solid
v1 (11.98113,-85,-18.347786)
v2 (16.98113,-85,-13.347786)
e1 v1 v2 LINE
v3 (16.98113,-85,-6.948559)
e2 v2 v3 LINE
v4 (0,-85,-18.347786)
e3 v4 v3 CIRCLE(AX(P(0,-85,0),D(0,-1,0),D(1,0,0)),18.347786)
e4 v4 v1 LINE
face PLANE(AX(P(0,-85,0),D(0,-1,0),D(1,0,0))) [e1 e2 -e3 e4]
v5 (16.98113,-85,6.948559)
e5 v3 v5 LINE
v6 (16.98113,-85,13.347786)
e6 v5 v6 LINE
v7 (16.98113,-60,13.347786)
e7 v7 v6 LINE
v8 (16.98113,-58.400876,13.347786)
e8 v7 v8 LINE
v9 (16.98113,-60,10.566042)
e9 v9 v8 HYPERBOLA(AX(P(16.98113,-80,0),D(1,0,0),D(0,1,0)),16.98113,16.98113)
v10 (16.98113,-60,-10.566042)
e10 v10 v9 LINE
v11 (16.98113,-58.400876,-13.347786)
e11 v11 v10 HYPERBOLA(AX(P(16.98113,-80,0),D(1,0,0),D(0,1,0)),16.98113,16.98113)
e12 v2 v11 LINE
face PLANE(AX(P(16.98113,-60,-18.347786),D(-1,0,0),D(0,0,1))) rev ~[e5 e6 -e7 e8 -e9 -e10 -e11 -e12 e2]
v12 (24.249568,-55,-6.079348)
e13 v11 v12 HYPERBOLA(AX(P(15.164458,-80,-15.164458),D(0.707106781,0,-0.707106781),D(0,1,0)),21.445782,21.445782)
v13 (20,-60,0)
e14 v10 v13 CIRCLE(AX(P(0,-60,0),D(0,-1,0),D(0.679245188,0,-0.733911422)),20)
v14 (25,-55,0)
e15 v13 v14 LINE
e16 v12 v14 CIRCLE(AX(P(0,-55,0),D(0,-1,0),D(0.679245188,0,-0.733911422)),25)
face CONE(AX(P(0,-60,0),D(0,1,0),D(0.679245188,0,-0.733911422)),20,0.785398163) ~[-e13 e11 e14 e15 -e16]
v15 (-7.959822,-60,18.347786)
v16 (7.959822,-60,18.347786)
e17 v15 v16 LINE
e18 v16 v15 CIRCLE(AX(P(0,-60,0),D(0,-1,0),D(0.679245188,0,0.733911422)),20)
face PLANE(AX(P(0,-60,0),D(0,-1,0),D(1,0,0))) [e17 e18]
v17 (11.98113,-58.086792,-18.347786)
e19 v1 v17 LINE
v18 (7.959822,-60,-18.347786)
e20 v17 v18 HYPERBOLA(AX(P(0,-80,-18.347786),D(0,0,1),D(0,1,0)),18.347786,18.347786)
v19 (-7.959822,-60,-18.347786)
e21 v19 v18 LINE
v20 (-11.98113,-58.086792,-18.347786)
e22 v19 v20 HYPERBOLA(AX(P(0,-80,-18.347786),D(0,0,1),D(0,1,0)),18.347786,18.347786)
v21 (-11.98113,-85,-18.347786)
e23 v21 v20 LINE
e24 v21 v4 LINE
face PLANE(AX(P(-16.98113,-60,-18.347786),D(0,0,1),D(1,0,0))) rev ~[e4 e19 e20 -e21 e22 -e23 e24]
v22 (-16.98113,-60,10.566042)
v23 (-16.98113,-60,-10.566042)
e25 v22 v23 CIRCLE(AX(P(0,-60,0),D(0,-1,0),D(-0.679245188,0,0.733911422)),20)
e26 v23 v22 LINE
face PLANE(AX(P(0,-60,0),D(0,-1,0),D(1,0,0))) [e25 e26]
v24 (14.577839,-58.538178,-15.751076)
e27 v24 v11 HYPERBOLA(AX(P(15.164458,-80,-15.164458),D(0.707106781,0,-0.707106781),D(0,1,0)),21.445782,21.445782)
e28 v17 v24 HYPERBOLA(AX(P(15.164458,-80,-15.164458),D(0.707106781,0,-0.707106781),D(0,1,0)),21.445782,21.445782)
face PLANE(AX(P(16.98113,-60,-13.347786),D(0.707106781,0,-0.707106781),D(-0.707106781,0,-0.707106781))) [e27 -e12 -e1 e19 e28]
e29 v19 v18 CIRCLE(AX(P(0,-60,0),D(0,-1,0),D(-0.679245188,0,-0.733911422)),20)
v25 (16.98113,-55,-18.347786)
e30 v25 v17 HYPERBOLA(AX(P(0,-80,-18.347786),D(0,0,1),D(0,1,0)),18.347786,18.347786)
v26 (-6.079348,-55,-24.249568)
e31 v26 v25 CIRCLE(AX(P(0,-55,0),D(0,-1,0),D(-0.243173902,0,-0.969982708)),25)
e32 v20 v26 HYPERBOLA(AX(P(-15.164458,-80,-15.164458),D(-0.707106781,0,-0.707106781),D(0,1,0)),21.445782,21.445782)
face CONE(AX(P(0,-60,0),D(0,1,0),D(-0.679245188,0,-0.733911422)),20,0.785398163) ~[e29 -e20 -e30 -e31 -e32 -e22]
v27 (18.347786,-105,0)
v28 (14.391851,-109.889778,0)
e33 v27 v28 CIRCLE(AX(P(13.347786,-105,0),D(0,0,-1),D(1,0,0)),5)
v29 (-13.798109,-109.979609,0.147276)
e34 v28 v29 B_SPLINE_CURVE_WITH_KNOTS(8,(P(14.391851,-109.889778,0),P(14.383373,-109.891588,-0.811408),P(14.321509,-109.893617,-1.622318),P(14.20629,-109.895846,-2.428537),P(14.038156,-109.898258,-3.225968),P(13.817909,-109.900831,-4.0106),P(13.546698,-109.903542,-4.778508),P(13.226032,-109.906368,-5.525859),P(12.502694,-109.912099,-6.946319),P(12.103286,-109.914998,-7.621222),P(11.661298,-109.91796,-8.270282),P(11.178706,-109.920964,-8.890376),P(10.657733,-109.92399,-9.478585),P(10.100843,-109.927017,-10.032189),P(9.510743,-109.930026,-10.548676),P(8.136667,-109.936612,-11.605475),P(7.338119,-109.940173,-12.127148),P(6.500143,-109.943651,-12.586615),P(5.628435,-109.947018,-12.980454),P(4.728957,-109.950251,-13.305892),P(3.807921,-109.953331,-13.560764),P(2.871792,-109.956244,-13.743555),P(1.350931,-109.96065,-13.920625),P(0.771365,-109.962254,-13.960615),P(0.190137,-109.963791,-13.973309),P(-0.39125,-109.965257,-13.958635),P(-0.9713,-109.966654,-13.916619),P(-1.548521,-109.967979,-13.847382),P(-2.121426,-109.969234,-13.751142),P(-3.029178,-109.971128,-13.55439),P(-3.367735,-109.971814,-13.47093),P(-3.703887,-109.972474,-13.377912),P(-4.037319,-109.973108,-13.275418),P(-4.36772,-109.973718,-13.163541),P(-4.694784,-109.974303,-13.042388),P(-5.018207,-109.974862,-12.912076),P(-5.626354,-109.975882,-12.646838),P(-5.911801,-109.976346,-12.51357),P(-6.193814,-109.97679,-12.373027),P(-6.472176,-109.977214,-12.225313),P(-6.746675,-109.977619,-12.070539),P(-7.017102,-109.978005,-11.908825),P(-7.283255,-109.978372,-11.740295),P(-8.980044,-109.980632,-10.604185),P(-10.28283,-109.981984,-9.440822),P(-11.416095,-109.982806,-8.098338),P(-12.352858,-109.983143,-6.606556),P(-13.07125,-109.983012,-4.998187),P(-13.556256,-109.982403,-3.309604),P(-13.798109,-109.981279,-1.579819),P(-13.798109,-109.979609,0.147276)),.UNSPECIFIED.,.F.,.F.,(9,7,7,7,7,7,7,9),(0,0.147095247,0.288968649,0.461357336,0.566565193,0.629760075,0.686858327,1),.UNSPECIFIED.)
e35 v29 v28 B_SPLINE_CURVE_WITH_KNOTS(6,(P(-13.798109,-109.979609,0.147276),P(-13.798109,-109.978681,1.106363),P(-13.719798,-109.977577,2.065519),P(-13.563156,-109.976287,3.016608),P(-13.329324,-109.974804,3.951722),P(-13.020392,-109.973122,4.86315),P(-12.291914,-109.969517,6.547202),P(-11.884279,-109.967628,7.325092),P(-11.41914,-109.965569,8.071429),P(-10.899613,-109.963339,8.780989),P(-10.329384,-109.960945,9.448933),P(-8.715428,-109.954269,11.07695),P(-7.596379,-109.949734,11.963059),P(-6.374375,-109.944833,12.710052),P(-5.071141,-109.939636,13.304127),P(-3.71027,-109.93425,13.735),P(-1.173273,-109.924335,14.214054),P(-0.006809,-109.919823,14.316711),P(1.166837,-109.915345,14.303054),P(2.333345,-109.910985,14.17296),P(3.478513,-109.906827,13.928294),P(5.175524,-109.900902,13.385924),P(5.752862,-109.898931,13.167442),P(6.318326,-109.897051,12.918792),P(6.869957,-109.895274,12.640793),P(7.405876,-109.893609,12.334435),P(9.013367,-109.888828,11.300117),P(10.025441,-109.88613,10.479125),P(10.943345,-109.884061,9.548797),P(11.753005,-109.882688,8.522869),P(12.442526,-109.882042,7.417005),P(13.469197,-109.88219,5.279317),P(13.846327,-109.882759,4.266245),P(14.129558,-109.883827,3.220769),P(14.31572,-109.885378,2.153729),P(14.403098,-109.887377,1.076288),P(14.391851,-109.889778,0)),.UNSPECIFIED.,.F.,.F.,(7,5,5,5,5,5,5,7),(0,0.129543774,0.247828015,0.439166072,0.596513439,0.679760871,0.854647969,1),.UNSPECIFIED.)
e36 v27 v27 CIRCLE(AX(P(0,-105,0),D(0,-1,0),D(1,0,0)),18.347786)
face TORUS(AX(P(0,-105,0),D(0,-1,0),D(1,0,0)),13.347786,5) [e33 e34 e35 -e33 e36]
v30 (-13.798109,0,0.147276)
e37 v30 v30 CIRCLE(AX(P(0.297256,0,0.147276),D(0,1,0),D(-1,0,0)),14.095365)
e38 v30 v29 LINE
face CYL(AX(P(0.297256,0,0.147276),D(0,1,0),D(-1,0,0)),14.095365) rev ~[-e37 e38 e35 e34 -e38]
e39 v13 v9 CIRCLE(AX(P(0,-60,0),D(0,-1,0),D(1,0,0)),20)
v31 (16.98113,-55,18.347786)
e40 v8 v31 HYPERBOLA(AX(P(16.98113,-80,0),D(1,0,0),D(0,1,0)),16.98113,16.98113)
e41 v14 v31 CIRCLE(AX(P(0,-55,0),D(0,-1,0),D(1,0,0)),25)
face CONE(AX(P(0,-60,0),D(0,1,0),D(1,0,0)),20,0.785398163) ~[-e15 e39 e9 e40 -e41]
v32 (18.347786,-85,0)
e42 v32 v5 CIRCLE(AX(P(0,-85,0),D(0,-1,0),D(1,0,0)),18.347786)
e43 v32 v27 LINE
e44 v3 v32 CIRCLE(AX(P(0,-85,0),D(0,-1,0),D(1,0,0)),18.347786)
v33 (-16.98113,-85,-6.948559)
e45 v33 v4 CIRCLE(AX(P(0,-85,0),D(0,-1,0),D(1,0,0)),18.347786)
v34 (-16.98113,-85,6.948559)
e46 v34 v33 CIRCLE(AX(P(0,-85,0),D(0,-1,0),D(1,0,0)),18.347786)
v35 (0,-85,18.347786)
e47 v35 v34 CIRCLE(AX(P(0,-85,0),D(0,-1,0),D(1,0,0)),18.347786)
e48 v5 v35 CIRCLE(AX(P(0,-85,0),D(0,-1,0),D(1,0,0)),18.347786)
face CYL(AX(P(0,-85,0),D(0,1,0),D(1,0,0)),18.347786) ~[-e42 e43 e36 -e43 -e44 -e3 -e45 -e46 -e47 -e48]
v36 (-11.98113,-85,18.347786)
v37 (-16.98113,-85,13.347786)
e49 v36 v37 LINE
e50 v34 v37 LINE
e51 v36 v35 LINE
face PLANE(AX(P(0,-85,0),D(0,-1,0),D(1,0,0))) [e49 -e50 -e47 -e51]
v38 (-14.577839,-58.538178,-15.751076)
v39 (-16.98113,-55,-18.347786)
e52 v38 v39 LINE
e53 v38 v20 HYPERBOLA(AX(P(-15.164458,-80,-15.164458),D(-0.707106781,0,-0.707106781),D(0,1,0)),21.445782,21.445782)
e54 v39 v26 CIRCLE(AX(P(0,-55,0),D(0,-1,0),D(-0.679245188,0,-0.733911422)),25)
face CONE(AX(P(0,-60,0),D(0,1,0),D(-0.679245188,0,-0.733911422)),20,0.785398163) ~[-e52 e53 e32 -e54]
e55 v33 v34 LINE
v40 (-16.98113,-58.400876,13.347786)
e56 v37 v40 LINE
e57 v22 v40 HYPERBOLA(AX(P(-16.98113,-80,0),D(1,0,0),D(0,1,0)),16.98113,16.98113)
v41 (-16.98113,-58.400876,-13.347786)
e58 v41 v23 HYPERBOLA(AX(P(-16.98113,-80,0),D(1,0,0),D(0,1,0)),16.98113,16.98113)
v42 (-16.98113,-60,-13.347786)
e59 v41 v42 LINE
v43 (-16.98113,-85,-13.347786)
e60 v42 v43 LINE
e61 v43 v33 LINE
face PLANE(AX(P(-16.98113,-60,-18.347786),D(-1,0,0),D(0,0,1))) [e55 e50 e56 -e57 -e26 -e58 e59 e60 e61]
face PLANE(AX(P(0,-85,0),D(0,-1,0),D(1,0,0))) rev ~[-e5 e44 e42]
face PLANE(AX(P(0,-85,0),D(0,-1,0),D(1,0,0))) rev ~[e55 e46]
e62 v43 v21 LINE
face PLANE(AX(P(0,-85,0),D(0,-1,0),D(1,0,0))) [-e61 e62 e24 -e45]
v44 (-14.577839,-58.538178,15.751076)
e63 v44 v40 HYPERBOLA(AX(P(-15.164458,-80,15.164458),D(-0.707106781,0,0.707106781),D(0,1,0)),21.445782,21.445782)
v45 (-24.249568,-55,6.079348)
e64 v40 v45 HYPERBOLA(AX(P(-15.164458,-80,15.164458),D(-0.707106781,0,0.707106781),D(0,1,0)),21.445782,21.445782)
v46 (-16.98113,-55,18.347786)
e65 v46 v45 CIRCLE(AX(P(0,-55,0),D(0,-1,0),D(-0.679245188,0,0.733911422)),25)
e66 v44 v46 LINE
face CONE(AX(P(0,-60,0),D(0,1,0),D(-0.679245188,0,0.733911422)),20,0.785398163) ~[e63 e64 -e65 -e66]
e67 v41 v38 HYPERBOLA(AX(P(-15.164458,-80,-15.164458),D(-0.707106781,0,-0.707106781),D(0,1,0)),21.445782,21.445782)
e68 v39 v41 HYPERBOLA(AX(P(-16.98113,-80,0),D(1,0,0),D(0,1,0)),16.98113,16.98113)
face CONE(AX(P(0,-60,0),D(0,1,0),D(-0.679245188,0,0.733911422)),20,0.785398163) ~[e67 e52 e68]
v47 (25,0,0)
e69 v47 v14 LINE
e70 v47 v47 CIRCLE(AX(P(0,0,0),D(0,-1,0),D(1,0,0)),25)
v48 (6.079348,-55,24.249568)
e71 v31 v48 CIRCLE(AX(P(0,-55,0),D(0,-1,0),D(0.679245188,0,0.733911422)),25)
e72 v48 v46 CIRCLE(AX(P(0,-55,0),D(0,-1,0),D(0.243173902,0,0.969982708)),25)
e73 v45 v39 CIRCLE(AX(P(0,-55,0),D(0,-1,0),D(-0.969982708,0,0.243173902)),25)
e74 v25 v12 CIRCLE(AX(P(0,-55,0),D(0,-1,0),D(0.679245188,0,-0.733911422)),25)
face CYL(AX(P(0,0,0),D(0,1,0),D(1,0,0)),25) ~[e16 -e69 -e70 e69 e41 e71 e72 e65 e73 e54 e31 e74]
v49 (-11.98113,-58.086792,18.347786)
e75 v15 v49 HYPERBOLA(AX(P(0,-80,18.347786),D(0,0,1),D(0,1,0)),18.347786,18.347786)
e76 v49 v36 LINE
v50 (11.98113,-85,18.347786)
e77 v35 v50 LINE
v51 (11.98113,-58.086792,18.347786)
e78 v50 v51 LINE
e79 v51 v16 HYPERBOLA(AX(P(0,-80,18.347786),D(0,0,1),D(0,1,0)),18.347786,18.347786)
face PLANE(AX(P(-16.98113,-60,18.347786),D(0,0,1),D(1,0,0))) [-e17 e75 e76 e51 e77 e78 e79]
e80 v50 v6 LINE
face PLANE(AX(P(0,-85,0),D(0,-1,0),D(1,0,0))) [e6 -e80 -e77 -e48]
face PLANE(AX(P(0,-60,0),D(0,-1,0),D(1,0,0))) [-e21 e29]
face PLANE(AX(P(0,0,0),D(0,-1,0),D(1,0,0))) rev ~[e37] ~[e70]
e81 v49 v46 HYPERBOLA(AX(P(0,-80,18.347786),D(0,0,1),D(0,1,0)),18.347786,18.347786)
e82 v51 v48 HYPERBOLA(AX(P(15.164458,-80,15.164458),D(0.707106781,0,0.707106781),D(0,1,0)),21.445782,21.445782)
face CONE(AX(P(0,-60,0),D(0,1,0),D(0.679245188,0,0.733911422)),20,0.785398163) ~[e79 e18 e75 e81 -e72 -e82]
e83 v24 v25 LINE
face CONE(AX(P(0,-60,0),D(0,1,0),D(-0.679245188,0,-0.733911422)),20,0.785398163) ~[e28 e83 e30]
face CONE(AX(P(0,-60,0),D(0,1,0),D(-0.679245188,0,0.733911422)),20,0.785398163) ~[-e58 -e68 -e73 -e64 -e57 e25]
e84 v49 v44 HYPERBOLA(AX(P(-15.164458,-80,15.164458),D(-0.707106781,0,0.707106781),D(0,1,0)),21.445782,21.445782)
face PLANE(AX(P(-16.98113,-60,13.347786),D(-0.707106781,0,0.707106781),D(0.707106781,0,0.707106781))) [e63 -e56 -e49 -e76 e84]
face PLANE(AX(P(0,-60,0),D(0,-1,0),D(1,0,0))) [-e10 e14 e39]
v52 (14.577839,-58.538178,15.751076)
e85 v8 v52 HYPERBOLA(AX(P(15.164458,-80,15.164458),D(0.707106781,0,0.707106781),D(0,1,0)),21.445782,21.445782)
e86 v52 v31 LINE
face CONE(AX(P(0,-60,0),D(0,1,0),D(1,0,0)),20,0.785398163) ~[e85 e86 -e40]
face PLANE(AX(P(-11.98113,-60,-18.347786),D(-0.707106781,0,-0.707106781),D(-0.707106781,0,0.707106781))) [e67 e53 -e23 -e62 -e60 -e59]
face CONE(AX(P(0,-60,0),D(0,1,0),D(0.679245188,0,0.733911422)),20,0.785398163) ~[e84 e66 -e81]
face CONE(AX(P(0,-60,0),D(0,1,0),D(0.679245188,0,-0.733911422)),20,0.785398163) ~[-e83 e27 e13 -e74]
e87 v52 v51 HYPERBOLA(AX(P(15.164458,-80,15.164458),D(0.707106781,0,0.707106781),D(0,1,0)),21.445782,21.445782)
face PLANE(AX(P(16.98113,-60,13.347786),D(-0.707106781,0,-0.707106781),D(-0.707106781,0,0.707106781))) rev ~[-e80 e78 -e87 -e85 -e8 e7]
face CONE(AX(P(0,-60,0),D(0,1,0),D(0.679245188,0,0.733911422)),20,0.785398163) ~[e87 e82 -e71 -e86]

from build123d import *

# Parameters (mm, degrees)
F0_R         = 25
F1_DEPTH     = 60
F2_W         = 33.9622593881
F2_H         = 36.695571085
F3_DEPTH     = 25
F4_R         = 18.3477855425
F5_DEPTH     = 25.0000003725
F6_R         = 5
F8_T1_DEPTH  = 37.8584149398
F8_T6_ANGLE  = 94.4306250519
F8_T11_ANGLE = 94.4306250519
F8_T16_ANGLE = 94.4306250519
F8_T21_ANGLE = 47.2153125259
F8_T26_ANGLE = 47.2153125259
F8_T31_ANGLE = 47.2153125259
F8_T36_ANGLE = 47.2153125259
F8_T41_ANGLE = 85.5693749481
F8_T46_ANGLE = 85.5693749481
F8_T51_ANGLE = 85.5693749481
F8_T56_ANGLE = 85.5693749481
F8_T61_ANGLE = 85.5693749481
F8_T66_ANGLE = 85.5693749481
F9_R         = 14.0953649679
F10_DEPTH    = 200


# Not quite as in the source:
# - a fillet or chamfer that OpenCascade refuses, or shapes differently, is made with other operations: its cross-section is extruded or revolved along the edge and cut away or added
# - a feature of the source that left no trace in its solid (it failed there, or was rolled back) is left out


with BuildPart() as f1:
    # F0 (on Front) → F1 (new body)
    with BuildSketch(Plane.XZ):
        Circle(F0_R)
    extrude(amount=F1_DEPTH)

    # F2 (on face) → F3 (join)
    with BuildSketch(Plane.XZ.offset(60)):
        Rectangle(F2_W, F2_H)
    extrude(amount=F3_DEPTH)

    # F4 (on face) → F5 (join)
    with BuildSketch(Plane.XZ.offset(85)):
        Circle(F4_R)
    extrude(amount=F5_DEPTH)

    # F6
    f6_edges = [f1.edges().sort_by_distance(p)[0] for p in [
        (-18.347786, -110, 0),
    ]]
    fillet(f6_edges, radius=F6_R)

    # F8: chamfer of 5 on 9 edges, made by hand

    # F8_s2 → F8_t1 (cut)
    with BuildSketch(Plane.XZ.offset(60)):
        Polygon((16.9811296941, -13.3477855425), (11.9811296941, -18.3477855425), (16.9811296941, -18.3477855425), align=None)
        Polygon((16.9811296941, 13.3477855425), (11.9811296941, 18.3477855425), (16.9811296941, 18.3477855425), align=None)
        Polygon((-11.9811296941, -18.3477855425), (-16.9811296941, -13.3477855425), (-16.9811296941, -18.3477855425), align=None)
        Polygon((-16.9811296941, 13.3477855425), (-11.9811296941, 18.3477855425), (-16.9811296941, 18.3477855425), align=None)
    extrude(amount=F8_T1_DEPTH, mode=Mode.SUBTRACT)


with BuildPart() as f8_tool4:
    # F8_s5 → F8_t6 (revolve)
    with BuildSketch(Plane(origin=(0, 0, 0), x_dir=(0, 1, 0), z_dir=(0.7339114217, 0, 0.6792451878))):
        Polygon((-60, 20), (-55, 25), (-60, 25), align=None)
    revolve(axis=Axis((0, -60, 0), (0, -1, 0)), revolution_arc=F8_T6_ANGLE)

    split(bisect_by=Plane(origin=(-15.1644576183, 0, 15.1644576183), x_dir=(0, 1, 0), z_dir=(-0.7071067812, 0, 0.7071067812)), keep=Keep.TOP)


with BuildPart() as f1_1:
    add(f1.part)

    # F8_t3: cut F8_tool4
    add(f8_tool4.part, mode=Mode.SUBTRACT)


with BuildPart() as f8_tool9:
    # F8_s10 → F8_t11 (revolve)
    with BuildSketch(Plane(origin=(0, 0, 0), x_dir=(0, 1, 0), z_dir=(0.7339114217, 0, 0.6792451878))):
        Polygon((-60, 20), (-55, 25), (-60, 25), align=None)
    revolve(axis=Axis((0, -60, 0), (0, -1, 0)), revolution_arc=F8_T11_ANGLE)

    split(bisect_by=Plane.YZ.offset(-16.9811296941), keep=Keep.BOTTOM)


with BuildPart() as f1_2:
    add(f1_1.part)

    # F8_t8: cut F8_tool9
    add(f8_tool9.part, mode=Mode.SUBTRACT)


with BuildPart() as f8_tool14:
    # F8_s15 → F8_t16 (revolve)
    with BuildSketch(Plane(origin=(0, 0, 0), x_dir=(0, 1, 0), z_dir=(0.7339114217, 0, 0.6792451878))):
        Polygon((-60, 20), (-55, 25), (-60, 25), align=None)
    revolve(axis=Axis((0, -60, 0), (0, -1, 0)), revolution_arc=F8_T16_ANGLE)

    split(bisect_by=Plane(origin=(-15.1644576183, 0, -15.1644576183), x_dir=(0, 1, 0), z_dir=(-0.7071067812, 0, -0.7071067812)), keep=Keep.TOP)


with BuildPart() as f1_3:
    add(f1_2.part)

    # F8_t13: cut F8_tool14
    add(f8_tool14.part, mode=Mode.SUBTRACT)


with BuildPart() as f8_tool19:
    # F8_s20 → F8_t21 (revolve)
    with BuildSketch(Plane(origin=(0, 0, 0), x_dir=(0, 1, 0), z_dir=(-0.7339114217, 0, -0.6792451878))):
        Polygon((-60, 20), (-55, 25), (-60, 25), align=None)
    revolve(axis=Axis((0, -60, 0), (0, -1, 0)), revolution_arc=F8_T21_ANGLE)

    split(bisect_by=Plane(origin=(15.1644576183, 0, -15.1644576183), x_dir=(0, 1, 0), z_dir=(0.7071067812, 0, -0.7071067812)), keep=Keep.TOP)


with BuildPart() as f1_4:
    add(f1_3.part)

    # F8_t18: cut F8_tool19
    add(f8_tool19.part, mode=Mode.SUBTRACT)


with BuildPart() as f8_tool24:
    # F8_s25 → F8_t26 (revolve)
    with BuildSketch(Plane(origin=(0, 0, 0), x_dir=(0, 1, 0), z_dir=(-0.7339114217, 0, -0.6792451878))):
        Polygon((-60, 20), (-55, 25), (-60, 25), align=None)
    revolve(axis=Axis((0, -60, 0), (0, -1, 0)), revolution_arc=F8_T26_ANGLE)

    split(bisect_by=Plane.YZ.offset(16.9811296941), keep=Keep.TOP)


with BuildPart() as f1_5:
    add(f1_4.part)

    # F8_t23: cut F8_tool24
    add(f8_tool24.part, mode=Mode.SUBTRACT)


with BuildPart() as f8_tool29:
    # F8_s30 → F8_t31 (revolve)
    with BuildSketch(Plane.XY):
        Polygon((20, -60), (25, -55), (25, -60), align=None)
    revolve(axis=Axis((0, -60, 0), (0, -1, 0)), revolution_arc=F8_T31_ANGLE)

    split(bisect_by=Plane.YZ.offset(16.9811296941), keep=Keep.TOP)


with BuildPart() as f1_6:
    add(f1_5.part)

    # F8_t28: cut F8_tool29
    add(f8_tool29.part, mode=Mode.SUBTRACT)


with BuildPart() as f8_tool34:
    # F8_s35 → F8_t36 (revolve)
    with BuildSketch(Plane.XY):
        Polygon((20, -60), (25, -55), (25, -60), align=None)
    revolve(axis=Axis((0, -60, 0), (0, -1, 0)), revolution_arc=F8_T36_ANGLE)

    split(bisect_by=Plane(origin=(15.1644576183, 0, 15.1644576183), x_dir=(0, 1, 0), z_dir=(0.7071067812, 0, 0.7071067812)), keep=Keep.TOP)


with BuildPart() as f1_7:
    add(f1_6.part)

    # F8_t33: cut F8_tool34
    add(f8_tool34.part, mode=Mode.SUBTRACT)


with BuildPart() as f8_tool39:
    # F8_s40 → F8_t41 (revolve)
    with BuildSketch(Plane(origin=(0, 0, 0), x_dir=(0, 1, 0), z_dir=(-0.7339114217, 0, 0.6792451878))):
        Polygon((-60, 20), (-55, 25), (-60, 25), align=None)
    revolve(axis=Axis((0, -60, 0), (0, -1, 0)), revolution_arc=F8_T41_ANGLE)

    split(bisect_by=Plane(origin=(-15.1644576183, 0, -15.1644576183), x_dir=(0, 1, 0), z_dir=(-0.7071067812, 0, -0.7071067812)), keep=Keep.TOP)


with BuildPart() as f1_8:
    add(f1_7.part)

    # F8_t38: cut F8_tool39
    add(f8_tool39.part, mode=Mode.SUBTRACT)


with BuildPart() as f8_tool44:
    # F8_s45 → F8_t46 (revolve)
    with BuildSketch(Plane(origin=(0, 0, 0), x_dir=(0, 1, 0), z_dir=(-0.7339114217, 0, 0.6792451878))):
        Polygon((-60, 20), (-55, 25), (-60, 25), align=None)
    revolve(axis=Axis((0, -60, 0), (0, -1, 0)), revolution_arc=F8_T46_ANGLE)

    split(bisect_by=Plane.XY.offset(-18.3477855425), keep=Keep.BOTTOM)


with BuildPart() as f1_9:
    add(f1_8.part)

    # F8_t43: cut F8_tool44
    add(f8_tool44.part, mode=Mode.SUBTRACT)


with BuildPart() as f8_tool49:
    # F8_s50 → F8_t51 (revolve)
    with BuildSketch(Plane(origin=(0, 0, 0), x_dir=(0, 1, 0), z_dir=(-0.7339114217, 0, 0.6792451878))):
        Polygon((-60, 20), (-55, 25), (-60, 25), align=None)
    revolve(axis=Axis((0, -60, 0), (0, -1, 0)), revolution_arc=F8_T51_ANGLE)

    split(bisect_by=Plane(origin=(15.1644576183, 0, -15.1644576183), x_dir=(0, 1, 0), z_dir=(0.7071067812, 0, -0.7071067812)), keep=Keep.TOP)


with BuildPart() as f1_10:
    add(f1_9.part)

    # F8_t48: cut F8_tool49
    add(f8_tool49.part, mode=Mode.SUBTRACT)


with BuildPart() as f8_tool54:
    # F8_s55 → F8_t56 (revolve)
    with BuildSketch(Plane(origin=(0, 0, 0), x_dir=(0, 1, 0), z_dir=(0.7339114217, 0, -0.6792451878))):
        Polygon((-60, 20), (-55, 25), (-60, 25), align=None)
    revolve(axis=Axis((0, -60, 0), (0, -1, 0)), revolution_arc=F8_T56_ANGLE)

    split(bisect_by=Plane(origin=(15.1644576183, 0, 15.1644576183), x_dir=(0, 1, 0), z_dir=(0.7071067812, 0, 0.7071067812)), keep=Keep.TOP)


with BuildPart() as f1_11:
    add(f1_10.part)

    # F8_t53: cut F8_tool54
    add(f8_tool54.part, mode=Mode.SUBTRACT)


with BuildPart() as f8_tool59:
    # F8_s60 → F8_t61 (revolve)
    with BuildSketch(Plane(origin=(0, 0, 0), x_dir=(0, 1, 0), z_dir=(0.7339114217, 0, -0.6792451878))):
        Polygon((-60, 20), (-55, 25), (-60, 25), align=None)
    revolve(axis=Axis((0, -60, 0), (0, -1, 0)), revolution_arc=F8_T61_ANGLE)

    split(bisect_by=Plane.XY.offset(18.3477855425), keep=Keep.TOP)


with BuildPart() as f1_12:
    add(f1_11.part)

    # F8_t58: cut F8_tool59
    add(f8_tool59.part, mode=Mode.SUBTRACT)


with BuildPart() as f8_tool64:
    # F8_s65 → F8_t66 (revolve)
    with BuildSketch(Plane(origin=(0, 0, 0), x_dir=(0, 1, 0), z_dir=(0.7339114217, 0, -0.6792451878))):
        Polygon((-60, 20), (-55, 25), (-60, 25), align=None)
    revolve(axis=Axis((0, -60, 0), (0, -1, 0)), revolution_arc=F8_T66_ANGLE)

    split(bisect_by=Plane(origin=(-15.1644576183, 0, 15.1644576183), x_dir=(0, 1, 0), z_dir=(-0.7071067812, 0, 0.7071067812)), keep=Keep.TOP)


with BuildPart() as f1_13:
    add(f1_12.part)

    # F8_t63: cut F8_tool64
    add(f8_tool64.part, mode=Mode.SUBTRACT)

    # F9 (on face) → F10 (cut)
    with BuildSketch(Plane(origin=(0, 0, 0), x_dir=(-1, 0, 0), z_dir=(0, 1, 0))):
        with Locations((-0.2972558141, 0.1472756267)):
            Circle(F9_R)
    extrude(amount=-F10_DEPTH, mode=Mode.SUBTRACT)


solid = f1_13.part
